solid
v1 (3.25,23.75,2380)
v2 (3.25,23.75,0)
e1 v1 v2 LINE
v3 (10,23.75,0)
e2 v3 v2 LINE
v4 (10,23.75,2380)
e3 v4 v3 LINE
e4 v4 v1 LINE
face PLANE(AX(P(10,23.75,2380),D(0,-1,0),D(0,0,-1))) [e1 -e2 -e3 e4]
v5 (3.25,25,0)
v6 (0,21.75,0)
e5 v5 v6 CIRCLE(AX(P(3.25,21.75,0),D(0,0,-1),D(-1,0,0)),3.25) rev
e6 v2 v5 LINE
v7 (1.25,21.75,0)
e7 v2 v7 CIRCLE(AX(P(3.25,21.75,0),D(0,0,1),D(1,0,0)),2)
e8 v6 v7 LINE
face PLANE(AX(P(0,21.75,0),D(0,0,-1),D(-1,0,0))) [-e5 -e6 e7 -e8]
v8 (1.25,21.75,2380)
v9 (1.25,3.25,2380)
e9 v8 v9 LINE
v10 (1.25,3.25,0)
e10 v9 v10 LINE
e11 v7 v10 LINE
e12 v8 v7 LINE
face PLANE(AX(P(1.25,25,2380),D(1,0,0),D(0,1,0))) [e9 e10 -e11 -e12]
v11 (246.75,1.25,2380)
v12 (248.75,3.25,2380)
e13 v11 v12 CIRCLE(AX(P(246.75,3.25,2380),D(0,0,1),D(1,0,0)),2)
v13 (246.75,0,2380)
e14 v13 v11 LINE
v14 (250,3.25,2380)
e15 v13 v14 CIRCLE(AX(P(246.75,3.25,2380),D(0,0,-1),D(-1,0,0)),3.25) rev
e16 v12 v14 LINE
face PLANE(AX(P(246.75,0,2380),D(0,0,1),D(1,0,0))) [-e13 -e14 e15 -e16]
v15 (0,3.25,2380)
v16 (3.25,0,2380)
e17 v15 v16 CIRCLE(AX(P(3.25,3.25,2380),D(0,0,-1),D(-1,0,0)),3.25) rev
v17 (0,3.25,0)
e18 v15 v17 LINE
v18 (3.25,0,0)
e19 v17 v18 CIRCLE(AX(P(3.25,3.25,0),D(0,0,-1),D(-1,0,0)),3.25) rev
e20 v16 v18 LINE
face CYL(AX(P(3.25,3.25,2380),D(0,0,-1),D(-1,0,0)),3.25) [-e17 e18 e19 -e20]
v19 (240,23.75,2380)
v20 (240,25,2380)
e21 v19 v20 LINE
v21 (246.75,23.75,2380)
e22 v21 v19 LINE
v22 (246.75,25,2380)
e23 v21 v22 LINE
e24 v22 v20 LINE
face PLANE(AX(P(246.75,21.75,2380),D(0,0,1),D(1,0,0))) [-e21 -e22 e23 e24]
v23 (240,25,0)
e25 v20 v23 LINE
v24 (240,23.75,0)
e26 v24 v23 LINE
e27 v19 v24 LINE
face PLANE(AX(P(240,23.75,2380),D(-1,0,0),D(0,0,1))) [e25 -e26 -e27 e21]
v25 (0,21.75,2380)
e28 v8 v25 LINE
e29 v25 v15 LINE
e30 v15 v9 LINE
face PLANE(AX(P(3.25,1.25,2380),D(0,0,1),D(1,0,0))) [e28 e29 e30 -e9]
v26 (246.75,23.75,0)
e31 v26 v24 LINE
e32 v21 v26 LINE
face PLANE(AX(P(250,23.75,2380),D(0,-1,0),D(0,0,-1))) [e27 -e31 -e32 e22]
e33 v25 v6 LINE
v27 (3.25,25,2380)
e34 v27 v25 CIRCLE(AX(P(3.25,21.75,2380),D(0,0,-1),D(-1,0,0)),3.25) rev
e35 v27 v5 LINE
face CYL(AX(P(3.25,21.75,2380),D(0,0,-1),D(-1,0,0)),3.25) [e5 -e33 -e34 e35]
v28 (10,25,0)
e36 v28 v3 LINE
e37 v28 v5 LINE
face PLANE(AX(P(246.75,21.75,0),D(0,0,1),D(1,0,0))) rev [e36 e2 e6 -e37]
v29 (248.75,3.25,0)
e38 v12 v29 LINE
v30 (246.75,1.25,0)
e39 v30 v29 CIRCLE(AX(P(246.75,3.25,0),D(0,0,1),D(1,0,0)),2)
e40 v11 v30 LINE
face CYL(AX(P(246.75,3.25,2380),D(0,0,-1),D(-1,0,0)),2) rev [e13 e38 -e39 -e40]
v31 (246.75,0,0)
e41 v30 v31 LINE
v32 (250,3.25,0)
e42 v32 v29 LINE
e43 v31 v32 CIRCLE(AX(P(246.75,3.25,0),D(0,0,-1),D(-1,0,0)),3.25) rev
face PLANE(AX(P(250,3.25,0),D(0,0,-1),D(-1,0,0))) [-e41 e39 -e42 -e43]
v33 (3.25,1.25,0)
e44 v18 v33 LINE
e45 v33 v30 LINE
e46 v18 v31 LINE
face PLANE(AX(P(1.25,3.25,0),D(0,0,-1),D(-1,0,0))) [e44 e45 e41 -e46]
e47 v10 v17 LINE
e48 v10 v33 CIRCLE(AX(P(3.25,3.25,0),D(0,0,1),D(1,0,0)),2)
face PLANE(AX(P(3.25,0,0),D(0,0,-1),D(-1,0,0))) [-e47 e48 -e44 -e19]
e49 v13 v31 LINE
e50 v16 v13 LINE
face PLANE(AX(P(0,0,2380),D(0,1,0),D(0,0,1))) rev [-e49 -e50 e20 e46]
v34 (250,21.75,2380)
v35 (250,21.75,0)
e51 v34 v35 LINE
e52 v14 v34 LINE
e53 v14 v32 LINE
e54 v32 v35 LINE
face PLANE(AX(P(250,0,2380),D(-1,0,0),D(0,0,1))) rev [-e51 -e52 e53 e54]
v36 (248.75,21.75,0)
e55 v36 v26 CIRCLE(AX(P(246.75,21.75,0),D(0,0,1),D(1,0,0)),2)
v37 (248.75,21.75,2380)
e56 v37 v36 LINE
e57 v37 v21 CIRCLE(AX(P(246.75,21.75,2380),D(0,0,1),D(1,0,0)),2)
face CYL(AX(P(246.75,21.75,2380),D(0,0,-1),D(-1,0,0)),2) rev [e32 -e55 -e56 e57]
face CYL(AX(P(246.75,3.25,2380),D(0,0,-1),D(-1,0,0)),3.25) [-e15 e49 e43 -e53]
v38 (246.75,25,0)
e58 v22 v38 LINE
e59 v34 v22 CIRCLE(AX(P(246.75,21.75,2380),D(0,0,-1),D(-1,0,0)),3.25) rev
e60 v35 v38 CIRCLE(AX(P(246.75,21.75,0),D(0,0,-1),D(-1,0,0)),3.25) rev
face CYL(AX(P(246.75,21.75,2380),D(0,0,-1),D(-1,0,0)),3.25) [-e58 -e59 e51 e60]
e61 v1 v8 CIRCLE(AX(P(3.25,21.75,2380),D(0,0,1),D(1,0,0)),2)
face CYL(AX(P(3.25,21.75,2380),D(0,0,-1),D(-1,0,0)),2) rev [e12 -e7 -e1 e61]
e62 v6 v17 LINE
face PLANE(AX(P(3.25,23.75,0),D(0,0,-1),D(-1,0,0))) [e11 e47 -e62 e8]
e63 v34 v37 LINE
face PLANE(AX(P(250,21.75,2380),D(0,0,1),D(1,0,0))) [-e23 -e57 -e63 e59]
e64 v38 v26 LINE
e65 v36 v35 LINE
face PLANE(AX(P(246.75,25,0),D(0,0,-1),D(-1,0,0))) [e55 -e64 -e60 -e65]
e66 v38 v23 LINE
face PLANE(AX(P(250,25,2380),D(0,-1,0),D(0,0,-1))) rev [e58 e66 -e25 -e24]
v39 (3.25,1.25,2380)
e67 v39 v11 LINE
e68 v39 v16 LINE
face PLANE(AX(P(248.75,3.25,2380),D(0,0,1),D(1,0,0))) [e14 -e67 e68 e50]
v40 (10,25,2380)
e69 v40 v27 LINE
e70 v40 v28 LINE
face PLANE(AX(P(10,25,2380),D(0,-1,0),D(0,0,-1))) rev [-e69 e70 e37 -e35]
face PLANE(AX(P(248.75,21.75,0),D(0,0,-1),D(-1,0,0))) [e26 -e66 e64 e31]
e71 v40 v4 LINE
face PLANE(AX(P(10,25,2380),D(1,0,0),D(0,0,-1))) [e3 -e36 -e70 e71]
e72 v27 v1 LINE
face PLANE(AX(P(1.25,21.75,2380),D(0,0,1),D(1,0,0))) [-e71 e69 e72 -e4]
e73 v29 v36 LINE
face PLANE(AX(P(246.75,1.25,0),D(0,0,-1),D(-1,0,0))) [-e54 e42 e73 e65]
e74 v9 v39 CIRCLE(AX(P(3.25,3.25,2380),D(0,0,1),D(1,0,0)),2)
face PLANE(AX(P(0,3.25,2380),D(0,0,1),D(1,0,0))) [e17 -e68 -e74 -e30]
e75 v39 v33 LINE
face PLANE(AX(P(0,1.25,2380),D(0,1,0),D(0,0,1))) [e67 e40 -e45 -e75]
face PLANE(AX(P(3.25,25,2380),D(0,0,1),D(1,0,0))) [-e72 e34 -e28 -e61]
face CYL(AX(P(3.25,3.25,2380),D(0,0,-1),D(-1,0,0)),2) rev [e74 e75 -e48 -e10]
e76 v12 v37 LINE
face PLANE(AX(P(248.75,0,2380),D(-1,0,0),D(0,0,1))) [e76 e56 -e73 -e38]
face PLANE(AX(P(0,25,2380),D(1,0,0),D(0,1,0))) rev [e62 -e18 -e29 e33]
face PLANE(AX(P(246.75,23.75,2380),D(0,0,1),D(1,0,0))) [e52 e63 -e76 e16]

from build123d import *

# Parameters (mm, degrees)
BASE_FLANGE1_DEPTH = 2380


# Sheet-metal steps are written as plain solids
with BuildPart() as part:
    # Sketch1 → Base-Flange1 (new body)
    with BuildSketch(Plane.XY):
        with BuildLine():
            Line((10, 25), (3.25, 25))
            ThreePointArc((3.25, 25), (0.951902961, 24.048097039), (0, 21.75))
            Line((0, 21.75), (0, 3.25))
            ThreePointArc((0, 3.25), (0.951902961, 0.951902961), (3.25, 0))
            Line((3.25, 0), (246.75, 0))
            ThreePointArc((246.75, 0), (249.048097039, 0.951902961), (250, 3.25))
            Line((250, 3.25), (250, 21.75))
            ThreePointArc((250, 21.75), (249.048097039, 24.048097039), (246.75, 25))
            Line((246.75, 25), (240, 25))
            Line((240, 25), (240, 23.75))
            Line((240, 23.75), (246.75, 23.75))
            ThreePointArc((246.75, 23.75), (248.164213562, 23.164213562), (248.75, 21.75))
            Line((248.75, 21.75), (248.75, 3.25))
            ThreePointArc((248.75, 3.25), (248.164213562, 1.835786438), (246.75, 1.25))
            Line((246.75, 1.25), (3.25, 1.25))
            ThreePointArc((3.25, 1.25), (1.835786438, 1.835786438), (1.25, 3.25))
            Line((1.25, 3.25), (1.25, 21.75))
            ThreePointArc((1.25, 21.75), (1.835786438, 23.164213562), (3.25, 23.75))
            Line((3.25, 23.75), (10, 23.75))
            Line((10, 23.75), (10, 25))
        make_face()
    extrude(amount=BASE_FLANGE1_DEPTH)


solid = part.part
